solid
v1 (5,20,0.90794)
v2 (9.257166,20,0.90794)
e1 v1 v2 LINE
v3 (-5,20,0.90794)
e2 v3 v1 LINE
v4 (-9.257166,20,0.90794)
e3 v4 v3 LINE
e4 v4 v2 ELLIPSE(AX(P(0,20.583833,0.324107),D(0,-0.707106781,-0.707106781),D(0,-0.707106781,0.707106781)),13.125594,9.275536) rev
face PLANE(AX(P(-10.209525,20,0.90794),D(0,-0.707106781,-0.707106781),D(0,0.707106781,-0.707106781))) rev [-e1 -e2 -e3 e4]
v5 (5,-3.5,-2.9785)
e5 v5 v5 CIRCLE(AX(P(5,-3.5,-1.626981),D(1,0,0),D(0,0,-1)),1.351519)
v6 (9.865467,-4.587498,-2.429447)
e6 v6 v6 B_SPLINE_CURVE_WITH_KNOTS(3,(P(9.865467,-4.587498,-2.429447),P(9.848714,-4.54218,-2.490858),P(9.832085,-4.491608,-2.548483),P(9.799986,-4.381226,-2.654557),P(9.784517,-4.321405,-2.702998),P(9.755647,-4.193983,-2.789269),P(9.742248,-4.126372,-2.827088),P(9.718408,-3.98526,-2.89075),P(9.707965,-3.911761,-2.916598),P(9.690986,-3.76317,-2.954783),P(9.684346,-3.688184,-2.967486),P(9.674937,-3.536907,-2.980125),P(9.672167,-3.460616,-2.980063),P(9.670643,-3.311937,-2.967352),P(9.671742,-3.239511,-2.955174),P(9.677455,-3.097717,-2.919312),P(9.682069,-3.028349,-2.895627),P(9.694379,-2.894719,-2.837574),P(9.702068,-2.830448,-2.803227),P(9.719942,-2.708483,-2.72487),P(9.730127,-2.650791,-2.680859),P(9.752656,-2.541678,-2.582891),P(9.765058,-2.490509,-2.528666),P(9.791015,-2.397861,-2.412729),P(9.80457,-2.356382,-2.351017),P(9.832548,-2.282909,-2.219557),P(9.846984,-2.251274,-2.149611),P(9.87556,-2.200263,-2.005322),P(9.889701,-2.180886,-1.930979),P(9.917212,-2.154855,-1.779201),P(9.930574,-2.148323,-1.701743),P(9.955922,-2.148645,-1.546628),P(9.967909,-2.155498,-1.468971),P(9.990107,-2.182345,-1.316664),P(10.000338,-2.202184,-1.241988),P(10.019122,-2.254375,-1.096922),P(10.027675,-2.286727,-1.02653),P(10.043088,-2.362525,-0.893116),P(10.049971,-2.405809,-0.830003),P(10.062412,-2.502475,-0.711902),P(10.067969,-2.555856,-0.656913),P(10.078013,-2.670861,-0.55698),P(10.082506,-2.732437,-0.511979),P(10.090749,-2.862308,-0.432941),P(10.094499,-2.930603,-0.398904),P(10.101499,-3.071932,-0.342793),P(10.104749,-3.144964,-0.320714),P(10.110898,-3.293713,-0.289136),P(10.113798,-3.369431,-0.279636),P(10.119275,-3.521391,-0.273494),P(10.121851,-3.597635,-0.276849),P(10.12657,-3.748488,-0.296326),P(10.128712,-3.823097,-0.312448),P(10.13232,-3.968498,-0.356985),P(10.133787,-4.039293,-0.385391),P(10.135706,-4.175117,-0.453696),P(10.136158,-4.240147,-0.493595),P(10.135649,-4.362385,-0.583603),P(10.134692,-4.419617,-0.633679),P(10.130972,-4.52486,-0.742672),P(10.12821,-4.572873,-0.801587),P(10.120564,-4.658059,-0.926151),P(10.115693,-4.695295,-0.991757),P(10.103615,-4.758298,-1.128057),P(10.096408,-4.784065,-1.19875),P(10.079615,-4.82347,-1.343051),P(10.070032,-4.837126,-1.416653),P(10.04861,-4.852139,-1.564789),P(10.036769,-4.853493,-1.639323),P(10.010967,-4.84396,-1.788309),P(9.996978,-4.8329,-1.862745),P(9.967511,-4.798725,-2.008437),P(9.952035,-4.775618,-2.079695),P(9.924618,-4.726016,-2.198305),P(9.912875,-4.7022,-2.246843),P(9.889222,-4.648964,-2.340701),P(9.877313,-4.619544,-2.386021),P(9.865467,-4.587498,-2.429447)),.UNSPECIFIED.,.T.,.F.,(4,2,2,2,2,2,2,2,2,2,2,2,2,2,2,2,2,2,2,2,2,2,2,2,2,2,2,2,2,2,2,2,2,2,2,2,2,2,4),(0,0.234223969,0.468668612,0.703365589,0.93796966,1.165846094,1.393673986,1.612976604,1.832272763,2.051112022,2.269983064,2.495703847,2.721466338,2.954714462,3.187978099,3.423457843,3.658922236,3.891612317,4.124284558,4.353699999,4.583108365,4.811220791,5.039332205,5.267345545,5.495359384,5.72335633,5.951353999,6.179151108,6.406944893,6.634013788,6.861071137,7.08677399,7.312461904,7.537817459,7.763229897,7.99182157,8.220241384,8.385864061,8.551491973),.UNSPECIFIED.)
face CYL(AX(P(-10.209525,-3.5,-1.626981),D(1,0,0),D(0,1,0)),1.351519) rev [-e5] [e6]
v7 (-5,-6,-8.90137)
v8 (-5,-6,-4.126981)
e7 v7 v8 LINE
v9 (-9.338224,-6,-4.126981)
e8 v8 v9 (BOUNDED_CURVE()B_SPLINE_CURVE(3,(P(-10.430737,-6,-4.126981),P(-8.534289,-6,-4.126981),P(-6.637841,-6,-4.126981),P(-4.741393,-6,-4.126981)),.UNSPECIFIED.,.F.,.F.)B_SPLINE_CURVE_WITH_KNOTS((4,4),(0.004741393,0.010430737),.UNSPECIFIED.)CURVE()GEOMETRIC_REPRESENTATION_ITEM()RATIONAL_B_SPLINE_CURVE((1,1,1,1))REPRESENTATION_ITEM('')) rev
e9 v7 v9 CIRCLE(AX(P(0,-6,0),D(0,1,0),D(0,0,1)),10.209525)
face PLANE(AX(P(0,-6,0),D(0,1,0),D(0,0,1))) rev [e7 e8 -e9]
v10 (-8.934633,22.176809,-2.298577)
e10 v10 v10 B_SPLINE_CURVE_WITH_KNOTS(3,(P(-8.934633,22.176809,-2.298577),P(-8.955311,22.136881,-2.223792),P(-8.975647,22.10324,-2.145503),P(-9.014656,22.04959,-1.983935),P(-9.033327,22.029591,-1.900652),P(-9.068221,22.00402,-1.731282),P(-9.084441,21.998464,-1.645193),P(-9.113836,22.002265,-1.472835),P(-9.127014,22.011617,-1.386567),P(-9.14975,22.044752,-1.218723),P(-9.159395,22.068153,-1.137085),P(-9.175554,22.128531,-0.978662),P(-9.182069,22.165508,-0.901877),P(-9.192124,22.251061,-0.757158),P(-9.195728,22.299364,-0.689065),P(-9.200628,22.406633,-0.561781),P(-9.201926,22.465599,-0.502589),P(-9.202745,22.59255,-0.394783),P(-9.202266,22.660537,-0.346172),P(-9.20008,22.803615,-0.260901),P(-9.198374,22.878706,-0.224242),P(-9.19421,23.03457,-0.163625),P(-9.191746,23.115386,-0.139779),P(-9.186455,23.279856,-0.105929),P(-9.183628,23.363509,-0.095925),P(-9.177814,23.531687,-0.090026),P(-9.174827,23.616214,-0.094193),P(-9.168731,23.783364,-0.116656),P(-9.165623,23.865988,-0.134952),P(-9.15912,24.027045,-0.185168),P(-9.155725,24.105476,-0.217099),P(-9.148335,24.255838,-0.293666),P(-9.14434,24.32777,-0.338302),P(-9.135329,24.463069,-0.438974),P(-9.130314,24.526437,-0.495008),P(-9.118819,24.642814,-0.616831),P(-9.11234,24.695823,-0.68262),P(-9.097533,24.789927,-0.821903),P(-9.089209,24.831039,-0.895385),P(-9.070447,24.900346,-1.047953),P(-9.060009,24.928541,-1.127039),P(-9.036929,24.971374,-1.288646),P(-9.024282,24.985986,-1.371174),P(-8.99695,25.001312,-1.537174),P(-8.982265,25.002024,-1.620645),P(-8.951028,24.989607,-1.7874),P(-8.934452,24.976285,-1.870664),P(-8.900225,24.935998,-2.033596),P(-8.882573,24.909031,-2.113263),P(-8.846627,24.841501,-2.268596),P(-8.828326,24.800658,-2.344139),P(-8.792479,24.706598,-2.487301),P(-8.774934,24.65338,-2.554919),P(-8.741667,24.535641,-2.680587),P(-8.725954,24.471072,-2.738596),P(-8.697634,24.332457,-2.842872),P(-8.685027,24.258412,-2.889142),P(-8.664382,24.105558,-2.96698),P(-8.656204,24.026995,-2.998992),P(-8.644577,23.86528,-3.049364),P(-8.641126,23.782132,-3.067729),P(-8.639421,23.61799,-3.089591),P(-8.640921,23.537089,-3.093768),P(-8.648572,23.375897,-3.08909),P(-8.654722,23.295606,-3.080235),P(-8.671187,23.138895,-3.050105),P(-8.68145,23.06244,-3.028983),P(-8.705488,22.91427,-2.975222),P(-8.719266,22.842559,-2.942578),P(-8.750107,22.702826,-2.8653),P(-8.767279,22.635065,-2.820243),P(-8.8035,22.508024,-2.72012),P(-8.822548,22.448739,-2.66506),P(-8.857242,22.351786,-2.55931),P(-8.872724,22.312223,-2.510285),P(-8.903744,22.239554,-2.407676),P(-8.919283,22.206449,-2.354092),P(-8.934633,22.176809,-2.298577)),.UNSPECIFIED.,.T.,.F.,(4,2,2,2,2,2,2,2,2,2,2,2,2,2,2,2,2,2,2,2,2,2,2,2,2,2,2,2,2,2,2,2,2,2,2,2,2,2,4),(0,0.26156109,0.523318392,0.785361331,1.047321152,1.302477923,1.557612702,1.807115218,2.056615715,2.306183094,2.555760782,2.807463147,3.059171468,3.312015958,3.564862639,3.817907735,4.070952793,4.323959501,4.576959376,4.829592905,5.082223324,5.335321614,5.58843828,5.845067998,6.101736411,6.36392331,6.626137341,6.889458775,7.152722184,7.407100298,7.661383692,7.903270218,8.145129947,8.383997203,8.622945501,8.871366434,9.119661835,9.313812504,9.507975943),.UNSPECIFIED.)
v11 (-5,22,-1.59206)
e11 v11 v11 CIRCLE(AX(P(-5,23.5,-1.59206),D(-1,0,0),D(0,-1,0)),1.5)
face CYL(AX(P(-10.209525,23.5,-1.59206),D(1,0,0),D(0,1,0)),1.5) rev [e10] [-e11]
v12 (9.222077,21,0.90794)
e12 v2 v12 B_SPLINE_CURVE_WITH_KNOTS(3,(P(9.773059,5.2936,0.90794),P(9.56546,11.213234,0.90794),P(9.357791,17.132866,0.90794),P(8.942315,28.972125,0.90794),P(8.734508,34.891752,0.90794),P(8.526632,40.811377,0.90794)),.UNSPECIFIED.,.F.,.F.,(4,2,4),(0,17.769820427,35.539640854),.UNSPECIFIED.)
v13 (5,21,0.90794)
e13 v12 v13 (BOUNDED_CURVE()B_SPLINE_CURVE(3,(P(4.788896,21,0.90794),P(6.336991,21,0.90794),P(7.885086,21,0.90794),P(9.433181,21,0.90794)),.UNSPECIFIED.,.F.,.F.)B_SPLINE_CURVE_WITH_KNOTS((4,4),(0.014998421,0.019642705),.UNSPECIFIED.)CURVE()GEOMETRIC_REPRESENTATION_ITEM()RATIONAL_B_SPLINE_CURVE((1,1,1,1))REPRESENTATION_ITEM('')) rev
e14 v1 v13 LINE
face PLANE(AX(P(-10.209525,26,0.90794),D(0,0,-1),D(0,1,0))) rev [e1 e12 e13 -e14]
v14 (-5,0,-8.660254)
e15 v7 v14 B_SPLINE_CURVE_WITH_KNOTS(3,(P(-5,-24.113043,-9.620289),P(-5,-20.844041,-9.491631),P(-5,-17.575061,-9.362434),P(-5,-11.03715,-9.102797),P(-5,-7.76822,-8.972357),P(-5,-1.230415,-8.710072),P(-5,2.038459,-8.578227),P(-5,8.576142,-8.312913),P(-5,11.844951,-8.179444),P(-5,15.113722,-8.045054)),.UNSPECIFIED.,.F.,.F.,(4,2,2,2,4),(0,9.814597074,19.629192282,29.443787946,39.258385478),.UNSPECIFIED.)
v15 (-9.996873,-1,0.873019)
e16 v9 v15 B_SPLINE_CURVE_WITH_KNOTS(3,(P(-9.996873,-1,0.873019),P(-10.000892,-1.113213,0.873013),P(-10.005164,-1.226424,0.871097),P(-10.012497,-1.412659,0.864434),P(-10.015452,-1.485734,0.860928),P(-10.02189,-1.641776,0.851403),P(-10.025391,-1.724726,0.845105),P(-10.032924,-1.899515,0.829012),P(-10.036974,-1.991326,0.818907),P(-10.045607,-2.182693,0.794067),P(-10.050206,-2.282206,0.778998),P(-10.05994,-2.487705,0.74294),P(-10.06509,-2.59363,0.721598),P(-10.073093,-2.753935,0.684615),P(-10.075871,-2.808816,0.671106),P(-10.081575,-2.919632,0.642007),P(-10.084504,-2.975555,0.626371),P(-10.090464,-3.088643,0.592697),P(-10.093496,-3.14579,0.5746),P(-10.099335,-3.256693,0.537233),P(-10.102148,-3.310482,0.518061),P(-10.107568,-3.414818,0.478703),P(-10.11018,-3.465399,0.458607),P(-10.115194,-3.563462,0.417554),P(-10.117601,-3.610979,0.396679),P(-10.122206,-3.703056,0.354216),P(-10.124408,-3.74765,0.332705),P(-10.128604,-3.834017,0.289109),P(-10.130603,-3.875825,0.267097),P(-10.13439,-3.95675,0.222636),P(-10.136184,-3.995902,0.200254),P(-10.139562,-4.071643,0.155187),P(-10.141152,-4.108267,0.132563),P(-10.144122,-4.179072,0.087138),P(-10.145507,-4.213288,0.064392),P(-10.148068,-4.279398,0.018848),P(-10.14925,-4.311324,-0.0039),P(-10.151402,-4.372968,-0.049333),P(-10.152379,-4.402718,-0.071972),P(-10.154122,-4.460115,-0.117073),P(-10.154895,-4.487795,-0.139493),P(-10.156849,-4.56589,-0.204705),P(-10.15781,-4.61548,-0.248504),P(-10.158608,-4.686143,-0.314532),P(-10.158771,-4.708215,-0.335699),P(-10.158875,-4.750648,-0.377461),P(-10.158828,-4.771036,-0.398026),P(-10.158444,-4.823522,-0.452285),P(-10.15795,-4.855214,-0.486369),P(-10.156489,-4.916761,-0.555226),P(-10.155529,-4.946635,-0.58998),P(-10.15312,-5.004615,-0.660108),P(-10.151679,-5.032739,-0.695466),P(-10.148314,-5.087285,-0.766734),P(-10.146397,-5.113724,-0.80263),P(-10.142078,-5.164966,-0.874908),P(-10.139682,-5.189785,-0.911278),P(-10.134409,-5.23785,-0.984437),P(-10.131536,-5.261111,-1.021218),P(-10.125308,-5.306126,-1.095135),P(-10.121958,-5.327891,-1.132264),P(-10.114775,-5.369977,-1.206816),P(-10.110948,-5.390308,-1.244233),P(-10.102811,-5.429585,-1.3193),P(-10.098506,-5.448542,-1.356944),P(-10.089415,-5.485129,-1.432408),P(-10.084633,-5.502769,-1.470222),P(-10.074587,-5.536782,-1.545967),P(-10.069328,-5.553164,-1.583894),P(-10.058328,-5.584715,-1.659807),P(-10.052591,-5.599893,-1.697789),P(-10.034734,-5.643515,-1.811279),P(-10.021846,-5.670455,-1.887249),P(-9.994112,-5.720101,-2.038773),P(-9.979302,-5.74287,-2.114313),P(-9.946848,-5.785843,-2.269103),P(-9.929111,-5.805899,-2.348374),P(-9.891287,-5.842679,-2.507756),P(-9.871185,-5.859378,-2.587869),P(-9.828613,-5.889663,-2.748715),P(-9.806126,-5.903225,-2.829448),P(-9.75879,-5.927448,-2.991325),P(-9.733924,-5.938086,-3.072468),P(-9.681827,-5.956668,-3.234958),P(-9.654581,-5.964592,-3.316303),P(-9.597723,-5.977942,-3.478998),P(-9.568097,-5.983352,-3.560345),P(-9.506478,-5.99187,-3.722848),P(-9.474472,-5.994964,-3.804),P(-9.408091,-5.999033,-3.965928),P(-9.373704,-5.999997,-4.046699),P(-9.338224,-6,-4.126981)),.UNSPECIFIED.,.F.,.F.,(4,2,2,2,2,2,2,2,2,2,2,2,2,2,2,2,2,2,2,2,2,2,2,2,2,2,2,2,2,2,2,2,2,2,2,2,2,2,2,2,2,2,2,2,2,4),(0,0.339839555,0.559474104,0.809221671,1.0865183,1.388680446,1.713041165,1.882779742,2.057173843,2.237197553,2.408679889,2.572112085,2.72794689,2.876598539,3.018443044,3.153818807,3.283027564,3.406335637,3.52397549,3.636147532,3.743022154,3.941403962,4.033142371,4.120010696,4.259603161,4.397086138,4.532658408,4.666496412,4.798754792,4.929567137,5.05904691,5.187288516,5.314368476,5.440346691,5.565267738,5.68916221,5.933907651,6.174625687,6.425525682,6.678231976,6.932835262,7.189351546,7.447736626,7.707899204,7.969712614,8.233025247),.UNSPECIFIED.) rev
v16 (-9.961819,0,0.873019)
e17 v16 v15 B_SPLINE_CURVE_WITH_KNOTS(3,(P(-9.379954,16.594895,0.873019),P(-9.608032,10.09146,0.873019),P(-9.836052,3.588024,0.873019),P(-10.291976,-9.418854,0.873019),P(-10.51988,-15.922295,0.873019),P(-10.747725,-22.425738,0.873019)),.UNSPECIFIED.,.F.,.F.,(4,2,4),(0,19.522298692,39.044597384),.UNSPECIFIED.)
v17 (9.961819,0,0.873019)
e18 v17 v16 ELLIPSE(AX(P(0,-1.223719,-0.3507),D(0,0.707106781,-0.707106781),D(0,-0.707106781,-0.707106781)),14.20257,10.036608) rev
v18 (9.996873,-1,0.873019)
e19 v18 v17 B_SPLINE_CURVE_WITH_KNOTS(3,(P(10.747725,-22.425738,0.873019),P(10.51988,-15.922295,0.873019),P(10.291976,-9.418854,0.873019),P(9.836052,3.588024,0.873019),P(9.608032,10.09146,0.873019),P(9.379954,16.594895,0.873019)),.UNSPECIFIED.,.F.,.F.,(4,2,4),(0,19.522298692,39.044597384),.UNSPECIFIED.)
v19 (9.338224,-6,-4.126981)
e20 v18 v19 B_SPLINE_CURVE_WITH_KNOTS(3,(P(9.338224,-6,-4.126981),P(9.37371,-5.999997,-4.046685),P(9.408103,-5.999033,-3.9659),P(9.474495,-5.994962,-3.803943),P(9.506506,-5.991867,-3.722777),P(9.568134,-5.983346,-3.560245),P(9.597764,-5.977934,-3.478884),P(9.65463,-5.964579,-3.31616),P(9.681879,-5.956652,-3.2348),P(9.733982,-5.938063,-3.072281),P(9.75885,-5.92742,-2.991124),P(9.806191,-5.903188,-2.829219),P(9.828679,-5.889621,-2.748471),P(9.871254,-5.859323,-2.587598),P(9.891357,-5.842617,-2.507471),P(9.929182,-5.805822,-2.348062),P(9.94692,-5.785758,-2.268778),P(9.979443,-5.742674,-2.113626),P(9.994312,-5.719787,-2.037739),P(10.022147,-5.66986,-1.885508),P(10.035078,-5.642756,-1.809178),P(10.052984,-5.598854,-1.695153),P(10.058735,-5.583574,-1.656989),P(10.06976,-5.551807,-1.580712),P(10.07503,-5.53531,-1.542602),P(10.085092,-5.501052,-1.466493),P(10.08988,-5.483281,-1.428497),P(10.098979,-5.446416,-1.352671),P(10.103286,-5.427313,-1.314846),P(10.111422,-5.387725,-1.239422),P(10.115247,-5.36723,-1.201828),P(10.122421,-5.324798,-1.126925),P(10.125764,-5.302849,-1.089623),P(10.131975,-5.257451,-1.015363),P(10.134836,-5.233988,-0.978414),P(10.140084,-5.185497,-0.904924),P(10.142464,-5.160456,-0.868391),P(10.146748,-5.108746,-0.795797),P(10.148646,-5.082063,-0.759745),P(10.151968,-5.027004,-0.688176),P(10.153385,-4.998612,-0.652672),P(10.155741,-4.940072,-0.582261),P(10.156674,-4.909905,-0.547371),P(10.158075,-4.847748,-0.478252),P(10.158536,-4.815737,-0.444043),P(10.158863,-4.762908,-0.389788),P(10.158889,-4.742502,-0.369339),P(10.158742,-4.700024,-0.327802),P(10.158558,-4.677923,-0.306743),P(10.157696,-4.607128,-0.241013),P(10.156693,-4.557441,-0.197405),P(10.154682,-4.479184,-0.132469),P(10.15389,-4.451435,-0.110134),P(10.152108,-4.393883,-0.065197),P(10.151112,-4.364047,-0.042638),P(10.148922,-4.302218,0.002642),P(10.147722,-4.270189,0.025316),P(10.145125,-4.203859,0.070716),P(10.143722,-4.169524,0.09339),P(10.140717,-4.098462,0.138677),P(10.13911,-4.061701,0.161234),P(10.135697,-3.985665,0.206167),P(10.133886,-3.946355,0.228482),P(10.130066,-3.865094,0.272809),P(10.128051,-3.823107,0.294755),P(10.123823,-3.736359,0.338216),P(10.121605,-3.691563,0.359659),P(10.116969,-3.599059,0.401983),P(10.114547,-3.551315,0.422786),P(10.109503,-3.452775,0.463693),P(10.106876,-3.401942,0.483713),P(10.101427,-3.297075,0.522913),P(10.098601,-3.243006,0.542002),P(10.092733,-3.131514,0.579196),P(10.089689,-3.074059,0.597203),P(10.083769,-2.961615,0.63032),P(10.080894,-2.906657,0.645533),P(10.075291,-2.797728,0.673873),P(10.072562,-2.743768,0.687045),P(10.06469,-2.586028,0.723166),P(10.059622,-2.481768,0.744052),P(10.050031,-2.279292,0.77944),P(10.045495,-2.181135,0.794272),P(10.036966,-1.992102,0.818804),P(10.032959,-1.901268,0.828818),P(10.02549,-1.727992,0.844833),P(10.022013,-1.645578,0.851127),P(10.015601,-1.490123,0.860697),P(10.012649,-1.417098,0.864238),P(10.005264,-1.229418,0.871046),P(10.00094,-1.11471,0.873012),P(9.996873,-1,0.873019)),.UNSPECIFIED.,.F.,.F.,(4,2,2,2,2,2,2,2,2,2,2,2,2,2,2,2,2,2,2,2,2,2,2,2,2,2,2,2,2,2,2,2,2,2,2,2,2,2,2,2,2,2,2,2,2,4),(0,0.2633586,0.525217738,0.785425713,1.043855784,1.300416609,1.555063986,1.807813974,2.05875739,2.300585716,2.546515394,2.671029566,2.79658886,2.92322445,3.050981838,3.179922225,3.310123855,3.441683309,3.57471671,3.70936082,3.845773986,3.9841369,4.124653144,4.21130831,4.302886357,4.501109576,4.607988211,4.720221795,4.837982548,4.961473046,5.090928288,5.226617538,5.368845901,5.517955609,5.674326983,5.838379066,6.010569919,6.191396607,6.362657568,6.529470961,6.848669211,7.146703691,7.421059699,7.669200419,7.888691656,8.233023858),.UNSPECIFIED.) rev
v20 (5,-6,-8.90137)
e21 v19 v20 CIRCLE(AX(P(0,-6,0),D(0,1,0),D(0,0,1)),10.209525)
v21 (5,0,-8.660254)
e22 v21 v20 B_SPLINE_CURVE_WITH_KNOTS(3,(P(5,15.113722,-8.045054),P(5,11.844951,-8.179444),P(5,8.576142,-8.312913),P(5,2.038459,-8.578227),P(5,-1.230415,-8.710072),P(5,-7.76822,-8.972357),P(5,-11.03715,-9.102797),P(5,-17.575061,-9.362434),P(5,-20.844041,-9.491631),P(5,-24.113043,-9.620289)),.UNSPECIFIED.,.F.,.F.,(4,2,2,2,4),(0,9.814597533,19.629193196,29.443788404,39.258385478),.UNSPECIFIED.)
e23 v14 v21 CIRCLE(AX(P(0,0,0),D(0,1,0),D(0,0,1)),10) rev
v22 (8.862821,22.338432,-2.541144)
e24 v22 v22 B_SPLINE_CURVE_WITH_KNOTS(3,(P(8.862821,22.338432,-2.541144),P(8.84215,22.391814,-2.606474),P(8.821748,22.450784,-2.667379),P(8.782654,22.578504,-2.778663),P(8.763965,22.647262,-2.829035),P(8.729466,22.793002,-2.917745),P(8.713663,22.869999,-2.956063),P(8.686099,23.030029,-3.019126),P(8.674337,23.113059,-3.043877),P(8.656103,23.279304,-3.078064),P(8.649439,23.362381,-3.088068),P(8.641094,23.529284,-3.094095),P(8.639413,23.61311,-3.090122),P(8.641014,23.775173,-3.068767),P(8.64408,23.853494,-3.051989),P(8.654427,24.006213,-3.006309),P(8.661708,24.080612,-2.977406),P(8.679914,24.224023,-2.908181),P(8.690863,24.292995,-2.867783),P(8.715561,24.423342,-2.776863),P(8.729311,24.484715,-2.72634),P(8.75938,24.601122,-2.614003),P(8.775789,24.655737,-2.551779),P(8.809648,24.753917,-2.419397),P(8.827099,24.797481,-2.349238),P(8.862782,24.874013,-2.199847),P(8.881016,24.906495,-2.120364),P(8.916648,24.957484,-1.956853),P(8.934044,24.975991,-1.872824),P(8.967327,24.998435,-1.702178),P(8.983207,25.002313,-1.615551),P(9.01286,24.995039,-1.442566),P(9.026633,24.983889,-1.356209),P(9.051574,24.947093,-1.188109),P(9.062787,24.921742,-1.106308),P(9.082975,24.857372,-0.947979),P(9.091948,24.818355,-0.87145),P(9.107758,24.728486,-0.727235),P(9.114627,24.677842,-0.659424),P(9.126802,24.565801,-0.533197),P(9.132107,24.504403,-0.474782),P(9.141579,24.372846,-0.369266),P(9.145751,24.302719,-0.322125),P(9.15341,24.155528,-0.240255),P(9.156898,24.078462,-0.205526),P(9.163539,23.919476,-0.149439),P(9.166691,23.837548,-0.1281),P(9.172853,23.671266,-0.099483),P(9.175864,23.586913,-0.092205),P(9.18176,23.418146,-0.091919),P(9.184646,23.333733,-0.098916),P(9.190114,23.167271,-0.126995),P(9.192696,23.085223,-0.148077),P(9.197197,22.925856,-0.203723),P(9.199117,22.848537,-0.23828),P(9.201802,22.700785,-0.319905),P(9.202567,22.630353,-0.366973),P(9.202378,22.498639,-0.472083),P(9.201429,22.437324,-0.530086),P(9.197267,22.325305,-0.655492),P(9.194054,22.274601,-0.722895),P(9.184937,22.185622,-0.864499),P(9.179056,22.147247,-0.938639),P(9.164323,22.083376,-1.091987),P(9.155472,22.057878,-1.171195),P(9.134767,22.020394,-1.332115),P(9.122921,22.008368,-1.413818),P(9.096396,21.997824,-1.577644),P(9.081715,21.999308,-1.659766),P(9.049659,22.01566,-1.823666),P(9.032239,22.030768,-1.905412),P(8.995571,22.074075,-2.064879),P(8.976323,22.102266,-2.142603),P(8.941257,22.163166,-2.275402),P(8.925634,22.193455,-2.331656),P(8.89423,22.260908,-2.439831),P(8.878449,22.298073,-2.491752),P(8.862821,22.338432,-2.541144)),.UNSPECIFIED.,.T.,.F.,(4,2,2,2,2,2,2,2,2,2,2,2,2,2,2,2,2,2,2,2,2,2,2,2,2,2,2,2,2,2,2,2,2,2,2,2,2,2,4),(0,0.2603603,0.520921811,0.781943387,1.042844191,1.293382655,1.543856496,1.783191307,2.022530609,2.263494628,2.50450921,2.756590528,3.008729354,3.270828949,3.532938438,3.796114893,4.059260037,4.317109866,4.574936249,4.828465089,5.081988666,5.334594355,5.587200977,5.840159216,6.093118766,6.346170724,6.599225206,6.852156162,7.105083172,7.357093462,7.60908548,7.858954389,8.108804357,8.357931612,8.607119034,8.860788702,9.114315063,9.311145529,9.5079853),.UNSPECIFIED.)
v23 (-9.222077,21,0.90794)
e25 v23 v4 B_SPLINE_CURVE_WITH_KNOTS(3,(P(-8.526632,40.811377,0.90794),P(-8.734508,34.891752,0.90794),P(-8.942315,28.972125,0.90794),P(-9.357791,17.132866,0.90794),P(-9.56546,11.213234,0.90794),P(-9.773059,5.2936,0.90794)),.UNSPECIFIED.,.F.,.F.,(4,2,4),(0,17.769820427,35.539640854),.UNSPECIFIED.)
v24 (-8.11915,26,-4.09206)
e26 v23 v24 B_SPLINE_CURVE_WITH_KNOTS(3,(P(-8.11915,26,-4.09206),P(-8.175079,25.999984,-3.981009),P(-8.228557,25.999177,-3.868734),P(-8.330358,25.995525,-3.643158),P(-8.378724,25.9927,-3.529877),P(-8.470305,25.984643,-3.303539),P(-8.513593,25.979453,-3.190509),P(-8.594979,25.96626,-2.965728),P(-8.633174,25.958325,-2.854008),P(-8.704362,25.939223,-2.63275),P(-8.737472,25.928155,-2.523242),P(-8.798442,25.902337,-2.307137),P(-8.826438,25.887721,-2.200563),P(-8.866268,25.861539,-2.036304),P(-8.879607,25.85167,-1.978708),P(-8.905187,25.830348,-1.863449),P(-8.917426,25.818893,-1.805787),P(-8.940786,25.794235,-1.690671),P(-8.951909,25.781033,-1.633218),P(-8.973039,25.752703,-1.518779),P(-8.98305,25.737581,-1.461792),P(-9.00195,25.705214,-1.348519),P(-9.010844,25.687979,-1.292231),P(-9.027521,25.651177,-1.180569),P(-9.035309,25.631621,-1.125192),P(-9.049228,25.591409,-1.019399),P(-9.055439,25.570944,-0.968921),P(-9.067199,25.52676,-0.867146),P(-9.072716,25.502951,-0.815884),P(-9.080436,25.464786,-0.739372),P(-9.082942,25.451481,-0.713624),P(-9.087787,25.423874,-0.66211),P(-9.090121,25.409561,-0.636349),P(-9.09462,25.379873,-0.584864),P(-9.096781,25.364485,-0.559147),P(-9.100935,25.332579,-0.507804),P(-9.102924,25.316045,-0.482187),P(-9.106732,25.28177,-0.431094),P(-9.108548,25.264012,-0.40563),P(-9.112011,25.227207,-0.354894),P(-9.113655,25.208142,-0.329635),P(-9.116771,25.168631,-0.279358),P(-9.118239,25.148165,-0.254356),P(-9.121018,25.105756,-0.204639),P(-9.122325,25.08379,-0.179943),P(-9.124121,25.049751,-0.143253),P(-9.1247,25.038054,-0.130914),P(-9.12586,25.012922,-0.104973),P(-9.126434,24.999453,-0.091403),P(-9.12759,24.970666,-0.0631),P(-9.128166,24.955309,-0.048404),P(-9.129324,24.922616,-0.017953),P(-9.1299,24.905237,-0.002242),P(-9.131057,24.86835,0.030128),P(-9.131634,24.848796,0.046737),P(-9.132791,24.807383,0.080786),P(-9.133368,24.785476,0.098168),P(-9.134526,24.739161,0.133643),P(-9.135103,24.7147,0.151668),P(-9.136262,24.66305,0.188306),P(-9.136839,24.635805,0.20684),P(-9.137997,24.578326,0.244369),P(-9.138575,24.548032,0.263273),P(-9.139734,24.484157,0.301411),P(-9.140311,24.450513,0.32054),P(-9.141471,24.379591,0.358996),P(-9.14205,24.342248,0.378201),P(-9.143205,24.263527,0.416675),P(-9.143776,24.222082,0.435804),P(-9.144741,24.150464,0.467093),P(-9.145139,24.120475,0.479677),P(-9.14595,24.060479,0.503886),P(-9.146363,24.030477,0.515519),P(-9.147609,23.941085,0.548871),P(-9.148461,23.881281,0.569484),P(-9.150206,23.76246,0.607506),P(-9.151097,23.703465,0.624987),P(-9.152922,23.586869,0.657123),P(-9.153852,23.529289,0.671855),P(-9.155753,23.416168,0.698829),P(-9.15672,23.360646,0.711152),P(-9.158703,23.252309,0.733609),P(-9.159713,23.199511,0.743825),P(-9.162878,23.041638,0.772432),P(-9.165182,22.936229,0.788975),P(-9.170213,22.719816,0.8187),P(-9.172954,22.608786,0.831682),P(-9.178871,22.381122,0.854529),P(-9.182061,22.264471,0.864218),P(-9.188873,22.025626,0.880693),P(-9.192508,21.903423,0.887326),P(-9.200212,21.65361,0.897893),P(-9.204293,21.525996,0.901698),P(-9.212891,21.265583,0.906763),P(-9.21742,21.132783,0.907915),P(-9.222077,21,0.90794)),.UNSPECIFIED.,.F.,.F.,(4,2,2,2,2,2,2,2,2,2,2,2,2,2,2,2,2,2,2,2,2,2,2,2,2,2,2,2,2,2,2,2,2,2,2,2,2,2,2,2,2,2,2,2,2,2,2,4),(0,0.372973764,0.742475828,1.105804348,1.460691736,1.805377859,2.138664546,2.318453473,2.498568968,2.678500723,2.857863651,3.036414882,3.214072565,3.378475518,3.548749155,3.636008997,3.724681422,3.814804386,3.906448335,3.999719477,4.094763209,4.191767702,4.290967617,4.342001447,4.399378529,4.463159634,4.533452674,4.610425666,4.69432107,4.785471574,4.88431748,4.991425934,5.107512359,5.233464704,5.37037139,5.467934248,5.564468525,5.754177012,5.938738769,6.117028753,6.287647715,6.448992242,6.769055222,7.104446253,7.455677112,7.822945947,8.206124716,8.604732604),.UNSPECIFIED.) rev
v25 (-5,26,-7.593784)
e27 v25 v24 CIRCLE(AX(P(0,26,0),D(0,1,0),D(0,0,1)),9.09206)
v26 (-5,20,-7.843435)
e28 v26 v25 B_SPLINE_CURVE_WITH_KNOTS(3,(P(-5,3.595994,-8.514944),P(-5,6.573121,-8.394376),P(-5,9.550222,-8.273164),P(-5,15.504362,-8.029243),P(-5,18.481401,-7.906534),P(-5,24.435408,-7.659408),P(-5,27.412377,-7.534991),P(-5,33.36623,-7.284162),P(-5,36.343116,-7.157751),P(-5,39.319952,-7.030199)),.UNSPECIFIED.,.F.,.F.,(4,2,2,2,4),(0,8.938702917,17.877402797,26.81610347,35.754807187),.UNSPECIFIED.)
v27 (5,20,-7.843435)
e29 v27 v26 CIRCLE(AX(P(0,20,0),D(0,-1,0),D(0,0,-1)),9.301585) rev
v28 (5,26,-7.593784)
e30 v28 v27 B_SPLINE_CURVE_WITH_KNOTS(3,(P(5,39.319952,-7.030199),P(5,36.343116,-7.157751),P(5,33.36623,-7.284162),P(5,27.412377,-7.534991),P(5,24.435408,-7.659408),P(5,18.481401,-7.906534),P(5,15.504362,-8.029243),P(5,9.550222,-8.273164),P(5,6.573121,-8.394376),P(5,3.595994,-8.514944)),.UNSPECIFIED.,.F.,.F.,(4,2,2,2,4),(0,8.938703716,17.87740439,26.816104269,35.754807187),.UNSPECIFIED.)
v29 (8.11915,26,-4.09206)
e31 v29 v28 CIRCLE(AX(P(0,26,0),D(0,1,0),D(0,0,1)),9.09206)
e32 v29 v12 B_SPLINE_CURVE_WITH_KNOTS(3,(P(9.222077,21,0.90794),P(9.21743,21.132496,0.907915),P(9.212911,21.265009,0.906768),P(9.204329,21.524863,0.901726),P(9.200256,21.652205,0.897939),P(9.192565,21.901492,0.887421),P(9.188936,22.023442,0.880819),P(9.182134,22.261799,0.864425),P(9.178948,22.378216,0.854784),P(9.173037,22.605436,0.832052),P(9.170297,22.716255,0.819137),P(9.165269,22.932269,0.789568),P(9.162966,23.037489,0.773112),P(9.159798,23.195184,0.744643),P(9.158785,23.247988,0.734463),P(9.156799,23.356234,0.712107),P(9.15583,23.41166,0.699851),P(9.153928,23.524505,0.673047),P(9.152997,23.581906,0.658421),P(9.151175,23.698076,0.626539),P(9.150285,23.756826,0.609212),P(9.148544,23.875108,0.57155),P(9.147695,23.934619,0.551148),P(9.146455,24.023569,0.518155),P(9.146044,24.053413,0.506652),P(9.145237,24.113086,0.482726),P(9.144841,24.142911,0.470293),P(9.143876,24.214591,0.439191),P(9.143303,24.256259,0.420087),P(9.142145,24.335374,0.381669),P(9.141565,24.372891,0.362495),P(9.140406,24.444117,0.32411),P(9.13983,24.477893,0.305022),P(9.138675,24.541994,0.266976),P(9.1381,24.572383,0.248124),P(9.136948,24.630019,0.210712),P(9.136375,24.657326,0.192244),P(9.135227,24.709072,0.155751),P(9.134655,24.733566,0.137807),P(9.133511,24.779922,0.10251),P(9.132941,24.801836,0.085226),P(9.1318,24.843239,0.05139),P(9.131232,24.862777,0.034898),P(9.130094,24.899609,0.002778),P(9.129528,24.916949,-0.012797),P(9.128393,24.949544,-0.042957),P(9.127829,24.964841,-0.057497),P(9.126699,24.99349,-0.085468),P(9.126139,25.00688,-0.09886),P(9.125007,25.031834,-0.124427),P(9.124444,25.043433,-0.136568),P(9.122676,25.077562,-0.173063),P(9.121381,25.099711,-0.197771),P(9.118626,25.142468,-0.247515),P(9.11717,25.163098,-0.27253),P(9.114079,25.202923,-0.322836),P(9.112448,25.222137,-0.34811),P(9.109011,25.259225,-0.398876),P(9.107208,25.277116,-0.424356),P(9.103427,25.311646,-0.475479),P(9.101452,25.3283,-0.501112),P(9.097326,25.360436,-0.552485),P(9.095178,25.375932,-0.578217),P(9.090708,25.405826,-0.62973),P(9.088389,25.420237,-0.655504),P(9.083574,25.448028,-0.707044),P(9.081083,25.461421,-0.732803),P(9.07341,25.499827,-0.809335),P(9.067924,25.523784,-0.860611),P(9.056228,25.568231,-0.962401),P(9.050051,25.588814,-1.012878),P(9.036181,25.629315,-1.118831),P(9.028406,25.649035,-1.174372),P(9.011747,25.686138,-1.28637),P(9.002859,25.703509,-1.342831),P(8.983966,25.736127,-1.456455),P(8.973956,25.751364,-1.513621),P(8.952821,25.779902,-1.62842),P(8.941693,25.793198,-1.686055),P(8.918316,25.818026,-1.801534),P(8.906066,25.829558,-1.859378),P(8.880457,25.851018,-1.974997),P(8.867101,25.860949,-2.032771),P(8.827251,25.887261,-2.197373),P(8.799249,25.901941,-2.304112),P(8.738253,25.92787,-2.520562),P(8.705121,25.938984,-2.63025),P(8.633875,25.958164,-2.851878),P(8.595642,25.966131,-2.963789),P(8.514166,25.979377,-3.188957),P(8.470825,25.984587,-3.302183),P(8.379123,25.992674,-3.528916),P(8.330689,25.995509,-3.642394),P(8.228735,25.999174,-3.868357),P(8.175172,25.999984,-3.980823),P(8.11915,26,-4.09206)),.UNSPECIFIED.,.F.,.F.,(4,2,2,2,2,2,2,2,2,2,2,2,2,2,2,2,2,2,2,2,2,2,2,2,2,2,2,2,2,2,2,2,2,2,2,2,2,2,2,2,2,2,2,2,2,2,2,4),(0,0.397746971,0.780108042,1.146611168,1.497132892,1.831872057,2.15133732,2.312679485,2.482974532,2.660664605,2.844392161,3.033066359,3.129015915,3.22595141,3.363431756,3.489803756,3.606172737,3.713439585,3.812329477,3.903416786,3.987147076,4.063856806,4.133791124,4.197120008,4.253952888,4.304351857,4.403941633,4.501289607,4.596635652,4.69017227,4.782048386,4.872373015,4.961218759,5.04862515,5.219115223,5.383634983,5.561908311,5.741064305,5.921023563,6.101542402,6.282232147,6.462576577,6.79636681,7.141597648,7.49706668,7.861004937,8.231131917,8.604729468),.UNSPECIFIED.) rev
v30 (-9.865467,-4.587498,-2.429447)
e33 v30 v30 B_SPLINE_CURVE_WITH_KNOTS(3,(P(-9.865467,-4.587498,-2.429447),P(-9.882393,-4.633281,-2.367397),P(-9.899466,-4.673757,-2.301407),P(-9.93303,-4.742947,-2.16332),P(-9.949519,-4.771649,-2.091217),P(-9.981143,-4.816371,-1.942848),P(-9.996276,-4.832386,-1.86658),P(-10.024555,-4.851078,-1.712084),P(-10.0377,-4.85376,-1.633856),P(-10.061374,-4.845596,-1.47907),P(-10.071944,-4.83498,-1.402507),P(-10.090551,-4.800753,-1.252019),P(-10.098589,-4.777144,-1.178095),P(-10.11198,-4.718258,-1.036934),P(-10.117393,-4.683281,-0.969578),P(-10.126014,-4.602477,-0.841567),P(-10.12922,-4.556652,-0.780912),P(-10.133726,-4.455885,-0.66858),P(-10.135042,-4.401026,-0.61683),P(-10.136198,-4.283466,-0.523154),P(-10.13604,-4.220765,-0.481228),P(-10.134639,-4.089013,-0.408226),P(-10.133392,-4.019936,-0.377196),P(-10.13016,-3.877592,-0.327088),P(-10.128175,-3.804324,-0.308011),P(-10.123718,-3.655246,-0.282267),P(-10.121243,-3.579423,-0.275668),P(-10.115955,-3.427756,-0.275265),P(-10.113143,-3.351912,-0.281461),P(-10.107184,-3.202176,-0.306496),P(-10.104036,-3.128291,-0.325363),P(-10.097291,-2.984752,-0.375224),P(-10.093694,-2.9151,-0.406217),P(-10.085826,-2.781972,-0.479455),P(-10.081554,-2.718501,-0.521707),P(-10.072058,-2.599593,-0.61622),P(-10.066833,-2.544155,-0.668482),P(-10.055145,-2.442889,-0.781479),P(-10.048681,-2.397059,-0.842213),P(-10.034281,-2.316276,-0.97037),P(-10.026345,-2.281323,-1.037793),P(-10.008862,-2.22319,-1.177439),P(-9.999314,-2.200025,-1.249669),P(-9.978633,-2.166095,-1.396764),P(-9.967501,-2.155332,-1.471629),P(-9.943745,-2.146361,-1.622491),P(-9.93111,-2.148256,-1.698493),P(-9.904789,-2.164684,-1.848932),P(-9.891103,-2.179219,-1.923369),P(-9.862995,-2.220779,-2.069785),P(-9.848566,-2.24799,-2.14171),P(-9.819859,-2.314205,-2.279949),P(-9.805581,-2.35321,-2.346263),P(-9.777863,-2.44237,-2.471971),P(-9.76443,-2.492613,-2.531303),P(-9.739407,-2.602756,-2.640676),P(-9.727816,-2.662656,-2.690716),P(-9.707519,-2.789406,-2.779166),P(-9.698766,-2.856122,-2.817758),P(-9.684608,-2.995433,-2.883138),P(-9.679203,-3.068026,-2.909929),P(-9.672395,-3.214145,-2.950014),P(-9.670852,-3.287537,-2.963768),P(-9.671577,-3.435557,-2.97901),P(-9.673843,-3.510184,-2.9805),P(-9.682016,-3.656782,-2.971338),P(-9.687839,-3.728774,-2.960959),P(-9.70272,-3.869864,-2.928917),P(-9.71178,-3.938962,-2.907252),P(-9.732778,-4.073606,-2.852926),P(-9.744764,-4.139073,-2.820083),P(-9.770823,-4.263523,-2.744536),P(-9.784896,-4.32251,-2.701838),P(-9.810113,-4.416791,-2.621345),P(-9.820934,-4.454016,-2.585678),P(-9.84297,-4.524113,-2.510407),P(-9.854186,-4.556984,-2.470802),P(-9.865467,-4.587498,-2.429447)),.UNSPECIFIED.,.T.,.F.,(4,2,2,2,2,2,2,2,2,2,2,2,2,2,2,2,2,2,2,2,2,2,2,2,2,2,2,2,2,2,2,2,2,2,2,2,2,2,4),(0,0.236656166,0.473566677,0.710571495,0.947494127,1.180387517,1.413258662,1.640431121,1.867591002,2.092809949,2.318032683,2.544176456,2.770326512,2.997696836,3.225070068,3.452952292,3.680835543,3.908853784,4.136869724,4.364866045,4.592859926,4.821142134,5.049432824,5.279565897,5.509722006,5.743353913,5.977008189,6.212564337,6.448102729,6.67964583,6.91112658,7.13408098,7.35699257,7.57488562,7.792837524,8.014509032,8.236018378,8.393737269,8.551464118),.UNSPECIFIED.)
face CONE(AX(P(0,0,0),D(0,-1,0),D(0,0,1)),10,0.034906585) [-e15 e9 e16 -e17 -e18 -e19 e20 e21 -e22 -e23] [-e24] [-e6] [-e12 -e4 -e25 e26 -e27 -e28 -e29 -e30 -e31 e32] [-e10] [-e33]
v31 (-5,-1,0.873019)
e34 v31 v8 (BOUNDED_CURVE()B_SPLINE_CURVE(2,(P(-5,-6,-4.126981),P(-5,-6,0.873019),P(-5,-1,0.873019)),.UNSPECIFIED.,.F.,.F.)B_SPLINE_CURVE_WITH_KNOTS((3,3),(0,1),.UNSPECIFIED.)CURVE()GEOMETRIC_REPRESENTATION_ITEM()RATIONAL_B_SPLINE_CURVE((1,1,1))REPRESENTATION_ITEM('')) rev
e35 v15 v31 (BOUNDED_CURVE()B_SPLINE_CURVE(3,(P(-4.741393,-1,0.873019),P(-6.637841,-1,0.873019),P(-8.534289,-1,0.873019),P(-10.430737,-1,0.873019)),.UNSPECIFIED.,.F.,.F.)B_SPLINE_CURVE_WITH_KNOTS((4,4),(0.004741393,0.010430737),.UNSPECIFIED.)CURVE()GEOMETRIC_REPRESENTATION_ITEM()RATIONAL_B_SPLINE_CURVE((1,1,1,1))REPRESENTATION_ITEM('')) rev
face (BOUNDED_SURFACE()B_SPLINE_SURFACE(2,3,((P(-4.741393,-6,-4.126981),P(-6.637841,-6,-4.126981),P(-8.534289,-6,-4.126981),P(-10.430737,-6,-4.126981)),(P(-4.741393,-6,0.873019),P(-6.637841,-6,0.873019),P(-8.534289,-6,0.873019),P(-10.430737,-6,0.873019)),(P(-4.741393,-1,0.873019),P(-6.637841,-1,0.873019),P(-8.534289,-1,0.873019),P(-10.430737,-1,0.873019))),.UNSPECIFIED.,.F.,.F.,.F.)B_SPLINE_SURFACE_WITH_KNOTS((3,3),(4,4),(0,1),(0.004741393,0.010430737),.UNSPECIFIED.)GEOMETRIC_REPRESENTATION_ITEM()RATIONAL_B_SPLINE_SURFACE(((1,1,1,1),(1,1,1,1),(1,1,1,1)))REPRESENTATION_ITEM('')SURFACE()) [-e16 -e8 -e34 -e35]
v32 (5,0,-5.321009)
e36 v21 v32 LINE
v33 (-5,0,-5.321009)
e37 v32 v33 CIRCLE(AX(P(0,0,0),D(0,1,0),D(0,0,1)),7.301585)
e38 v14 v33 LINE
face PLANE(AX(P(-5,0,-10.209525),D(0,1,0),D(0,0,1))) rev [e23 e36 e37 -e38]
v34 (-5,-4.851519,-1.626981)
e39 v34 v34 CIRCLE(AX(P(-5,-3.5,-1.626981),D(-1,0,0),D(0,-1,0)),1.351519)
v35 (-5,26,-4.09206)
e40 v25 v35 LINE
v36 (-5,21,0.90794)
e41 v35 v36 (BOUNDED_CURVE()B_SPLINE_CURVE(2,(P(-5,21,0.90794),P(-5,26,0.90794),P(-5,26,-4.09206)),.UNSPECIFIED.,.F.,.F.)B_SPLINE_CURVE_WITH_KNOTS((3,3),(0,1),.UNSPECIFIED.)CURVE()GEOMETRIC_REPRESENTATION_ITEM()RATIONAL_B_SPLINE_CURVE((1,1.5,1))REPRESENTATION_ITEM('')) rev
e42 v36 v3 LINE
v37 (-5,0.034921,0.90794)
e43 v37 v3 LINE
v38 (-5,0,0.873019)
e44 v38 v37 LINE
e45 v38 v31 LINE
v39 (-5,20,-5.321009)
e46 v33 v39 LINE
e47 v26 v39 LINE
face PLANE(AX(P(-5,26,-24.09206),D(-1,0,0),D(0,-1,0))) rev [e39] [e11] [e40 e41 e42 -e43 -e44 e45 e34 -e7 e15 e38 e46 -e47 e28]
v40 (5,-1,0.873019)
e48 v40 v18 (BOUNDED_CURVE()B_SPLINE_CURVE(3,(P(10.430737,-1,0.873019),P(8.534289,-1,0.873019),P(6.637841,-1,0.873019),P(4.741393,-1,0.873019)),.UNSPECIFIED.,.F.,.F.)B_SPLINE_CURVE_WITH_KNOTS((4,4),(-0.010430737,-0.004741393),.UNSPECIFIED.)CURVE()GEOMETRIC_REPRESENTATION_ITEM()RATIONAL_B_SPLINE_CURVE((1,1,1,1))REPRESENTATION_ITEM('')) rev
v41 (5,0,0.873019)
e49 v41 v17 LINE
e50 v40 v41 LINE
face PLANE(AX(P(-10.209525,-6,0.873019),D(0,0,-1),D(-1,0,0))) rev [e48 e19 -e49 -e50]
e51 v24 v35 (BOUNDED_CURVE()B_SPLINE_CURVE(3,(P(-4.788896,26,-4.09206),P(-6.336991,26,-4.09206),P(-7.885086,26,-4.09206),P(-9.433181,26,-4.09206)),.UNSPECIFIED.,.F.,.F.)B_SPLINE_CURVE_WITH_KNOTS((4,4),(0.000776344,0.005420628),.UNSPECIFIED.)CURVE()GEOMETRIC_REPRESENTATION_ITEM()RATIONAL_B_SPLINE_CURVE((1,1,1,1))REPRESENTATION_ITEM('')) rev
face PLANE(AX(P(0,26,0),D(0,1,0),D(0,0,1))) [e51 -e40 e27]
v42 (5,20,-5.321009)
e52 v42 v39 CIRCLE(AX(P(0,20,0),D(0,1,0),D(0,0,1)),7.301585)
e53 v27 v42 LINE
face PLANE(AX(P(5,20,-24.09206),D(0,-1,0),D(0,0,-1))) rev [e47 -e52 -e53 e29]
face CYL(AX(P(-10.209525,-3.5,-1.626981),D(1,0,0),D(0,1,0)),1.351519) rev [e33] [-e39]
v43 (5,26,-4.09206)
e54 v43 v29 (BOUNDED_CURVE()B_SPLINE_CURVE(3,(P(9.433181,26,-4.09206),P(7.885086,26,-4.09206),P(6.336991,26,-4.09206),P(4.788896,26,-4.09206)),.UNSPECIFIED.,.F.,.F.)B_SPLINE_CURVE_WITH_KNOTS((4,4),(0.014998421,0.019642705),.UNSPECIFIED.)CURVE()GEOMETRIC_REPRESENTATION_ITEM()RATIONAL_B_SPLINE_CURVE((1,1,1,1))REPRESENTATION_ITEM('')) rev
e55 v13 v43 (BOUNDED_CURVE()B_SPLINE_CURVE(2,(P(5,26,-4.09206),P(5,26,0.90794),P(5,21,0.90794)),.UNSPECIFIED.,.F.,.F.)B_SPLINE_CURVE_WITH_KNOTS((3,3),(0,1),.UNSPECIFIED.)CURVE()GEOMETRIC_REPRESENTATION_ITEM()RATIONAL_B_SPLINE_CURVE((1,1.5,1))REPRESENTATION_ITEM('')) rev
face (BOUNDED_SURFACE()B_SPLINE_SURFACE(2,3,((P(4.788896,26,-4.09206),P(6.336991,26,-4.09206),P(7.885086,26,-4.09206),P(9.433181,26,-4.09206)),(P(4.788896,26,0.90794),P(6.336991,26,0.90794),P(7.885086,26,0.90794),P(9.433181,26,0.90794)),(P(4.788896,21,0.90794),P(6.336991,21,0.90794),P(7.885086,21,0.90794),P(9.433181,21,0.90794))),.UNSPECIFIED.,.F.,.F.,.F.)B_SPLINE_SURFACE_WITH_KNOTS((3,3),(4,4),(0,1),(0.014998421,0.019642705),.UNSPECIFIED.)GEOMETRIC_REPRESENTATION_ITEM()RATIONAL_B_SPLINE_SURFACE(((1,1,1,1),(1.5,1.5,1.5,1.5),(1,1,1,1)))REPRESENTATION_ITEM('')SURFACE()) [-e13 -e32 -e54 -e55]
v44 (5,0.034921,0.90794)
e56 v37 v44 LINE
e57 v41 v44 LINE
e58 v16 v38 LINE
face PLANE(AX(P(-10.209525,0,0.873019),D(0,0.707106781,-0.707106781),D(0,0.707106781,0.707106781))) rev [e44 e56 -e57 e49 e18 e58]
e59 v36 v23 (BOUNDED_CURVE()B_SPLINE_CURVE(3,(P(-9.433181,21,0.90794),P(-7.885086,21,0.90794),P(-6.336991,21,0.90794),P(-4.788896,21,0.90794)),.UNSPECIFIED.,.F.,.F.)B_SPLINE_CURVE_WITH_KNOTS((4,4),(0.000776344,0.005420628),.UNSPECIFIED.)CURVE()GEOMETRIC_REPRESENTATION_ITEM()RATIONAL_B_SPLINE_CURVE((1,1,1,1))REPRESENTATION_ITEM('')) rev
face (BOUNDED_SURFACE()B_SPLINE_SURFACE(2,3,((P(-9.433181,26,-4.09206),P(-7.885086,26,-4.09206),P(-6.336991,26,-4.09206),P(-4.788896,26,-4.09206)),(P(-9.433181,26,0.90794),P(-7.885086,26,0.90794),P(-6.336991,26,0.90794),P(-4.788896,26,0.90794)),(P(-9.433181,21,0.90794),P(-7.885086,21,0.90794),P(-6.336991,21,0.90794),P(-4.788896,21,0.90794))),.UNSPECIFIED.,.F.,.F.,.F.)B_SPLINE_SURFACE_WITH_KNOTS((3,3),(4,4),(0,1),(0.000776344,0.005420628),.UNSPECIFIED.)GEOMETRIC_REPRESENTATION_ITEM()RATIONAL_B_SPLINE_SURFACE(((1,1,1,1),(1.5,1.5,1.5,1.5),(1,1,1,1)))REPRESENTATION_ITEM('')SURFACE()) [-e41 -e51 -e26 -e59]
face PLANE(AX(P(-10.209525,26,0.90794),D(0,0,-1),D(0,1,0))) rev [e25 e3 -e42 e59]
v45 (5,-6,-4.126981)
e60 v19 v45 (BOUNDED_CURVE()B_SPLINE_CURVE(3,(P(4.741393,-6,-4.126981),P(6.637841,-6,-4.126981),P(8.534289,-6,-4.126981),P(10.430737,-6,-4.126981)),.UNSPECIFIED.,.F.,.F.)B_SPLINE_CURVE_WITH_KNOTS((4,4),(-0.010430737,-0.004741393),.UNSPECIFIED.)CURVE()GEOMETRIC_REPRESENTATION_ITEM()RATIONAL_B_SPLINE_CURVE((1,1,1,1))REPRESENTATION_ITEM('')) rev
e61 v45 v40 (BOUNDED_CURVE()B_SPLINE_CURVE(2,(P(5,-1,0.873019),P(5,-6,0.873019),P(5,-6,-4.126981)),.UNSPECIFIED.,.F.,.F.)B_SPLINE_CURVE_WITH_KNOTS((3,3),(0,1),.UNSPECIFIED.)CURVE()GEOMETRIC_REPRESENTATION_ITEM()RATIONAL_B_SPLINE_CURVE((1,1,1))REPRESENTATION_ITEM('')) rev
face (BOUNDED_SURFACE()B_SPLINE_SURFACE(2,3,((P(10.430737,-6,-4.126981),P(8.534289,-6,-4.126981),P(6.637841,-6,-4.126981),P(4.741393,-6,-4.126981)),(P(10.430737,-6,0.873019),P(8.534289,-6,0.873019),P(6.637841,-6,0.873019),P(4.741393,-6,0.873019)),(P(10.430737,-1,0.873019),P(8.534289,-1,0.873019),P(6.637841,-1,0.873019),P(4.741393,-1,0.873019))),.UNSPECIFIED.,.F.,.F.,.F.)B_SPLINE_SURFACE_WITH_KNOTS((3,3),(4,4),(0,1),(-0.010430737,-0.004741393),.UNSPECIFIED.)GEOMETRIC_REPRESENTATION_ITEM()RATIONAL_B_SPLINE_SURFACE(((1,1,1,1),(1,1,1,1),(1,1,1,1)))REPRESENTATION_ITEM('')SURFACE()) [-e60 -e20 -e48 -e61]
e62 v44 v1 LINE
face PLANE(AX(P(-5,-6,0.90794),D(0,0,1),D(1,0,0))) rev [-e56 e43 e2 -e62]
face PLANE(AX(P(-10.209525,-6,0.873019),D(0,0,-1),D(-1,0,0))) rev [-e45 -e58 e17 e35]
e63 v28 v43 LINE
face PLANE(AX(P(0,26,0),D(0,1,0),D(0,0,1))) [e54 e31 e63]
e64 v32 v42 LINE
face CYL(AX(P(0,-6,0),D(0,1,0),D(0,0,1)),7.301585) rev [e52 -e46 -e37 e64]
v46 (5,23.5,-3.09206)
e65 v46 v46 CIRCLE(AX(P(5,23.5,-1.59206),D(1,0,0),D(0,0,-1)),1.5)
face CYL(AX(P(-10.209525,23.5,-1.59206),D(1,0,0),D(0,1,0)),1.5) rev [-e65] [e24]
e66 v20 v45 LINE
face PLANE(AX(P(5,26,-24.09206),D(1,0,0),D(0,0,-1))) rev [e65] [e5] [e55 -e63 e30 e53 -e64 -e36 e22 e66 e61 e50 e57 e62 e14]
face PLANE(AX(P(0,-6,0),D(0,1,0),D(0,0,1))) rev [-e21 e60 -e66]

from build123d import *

# Parameters (mm, degrees)
SKETCH1_R                     = 10
BOSS_EXTRUDE1_DEPTH           = 26
BOSS_EXTRUDE1_TAPER           = 2
BOSS_EXTRUDE1_OTHER_WAY_DEPTH = 6
BOSS_EXTRUDE1_OTHER_WAY_TAPER = -2
CUT_EXTRUDE1_DEPTH            = 30.740019936
CUT_EXTRUDE1_DEPTH_BACK       = 30.740019936
SKETCH3_W                     = 10
SKETCH3_H                     = 6
CUT_EXTRUDE2_DEPTH            = 25
CUT_EXTRUDE3_DEPTH            = 32.805094434
CUT_EXTRUDE3_DEPTH_BACK       = 32.805094434
SKETCH4_R                     = 1.5
FILLET2_SIZE                  = 5
CUT_EXTRUDE5_DEPTH            = 30.740020092
CUT_EXTRUDE5_DEPTH_BACK       = 30.740020092
SKETCH8_W                     = 10
SKETCH8_H                     = 6
CUT_EXTRUDE6_DEPTH            = 31.050909814
CUT_EXTRUDE7_DEPTH            = 30.668744533
CUT_EXTRUDE8_DEPTH            = 32.738456946
CUT_EXTRUDE8_DEPTH_BACK       = 32.738456946
SKETCH9_R                     = 1.351518808
FILLET3_SIZE                  = 5


with BuildPart() as part:
    # Sketch1 → Boss-Extrude1 (new body)
    with BuildSketch(Plane(origin=(0, 0, 0), x_dir=(1, 0, 0), z_dir=(0, 1, 0))):
        Circle(SKETCH1_R)
    extrude(amount=BOSS_EXTRUDE1_DEPTH, taper=BOSS_EXTRUDE1_TAPER)

    # Sketch1 → Boss-Extrude1 other way (add)
    with BuildSketch(Plane(origin=(0, 0, 0), x_dir=(1, 0, 0), z_dir=(0, 1, 0))):
        Circle(SKETCH1_R)
    extrude(amount=-BOSS_EXTRUDE1_OTHER_WAY_DEPTH, taper=BOSS_EXTRUDE1_OTHER_WAY_TAPER)

    # Sketch2 → Cut-Extrude1 (cut, two sides: drawn at the far end of the back side and taken through both)
    with BuildSketch(Plane(origin=(0, 0, 0), x_dir=(0, 0, -1), z_dir=(1, 0, 0)).offset(-CUT_EXTRUDE1_DEPTH_BACK)):
        Polygon((-0.907940007, 26), (-0.907940007, 20), (-13.415596948, 7.492343059), (-13.415596948, 26), align=None)
    extrude(amount=CUT_EXTRUDE1_DEPTH + CUT_EXTRUDE1_DEPTH_BACK, mode=Mode.SUBTRACT)

    # Sketch3 → Cut-Extrude2 (cut)
    with BuildSketch(Plane.XY.offset(0.907940007)):
        with Locations((0, 23)):
            Rectangle(SKETCH3_W, SKETCH3_H)
    extrude(amount=-CUT_EXTRUDE2_DEPTH, mode=Mode.SUBTRACT)

    # Sketch4 → Cut-Extrude3 (cut, two sides: drawn at the far end of the back side and taken through both)
    with BuildSketch(Plane(origin=(-5, 0, 0), x_dir=(0, 0, -1), z_dir=(1, 0, 0)).offset(-CUT_EXTRUDE3_DEPTH_BACK)):
        with Locations((1.592059993, 23.5)):
            Circle(SKETCH4_R)
    extrude(amount=CUT_EXTRUDE3_DEPTH + CUT_EXTRUDE3_DEPTH_BACK, mode=Mode.SUBTRACT)

    # Fillet2
    # a fillet whose section is not a circle: 5 mm, written as the material it takes off along each edge
    with BuildSketch(Plane(origin=(-7.5, 26, 0.907940007), x_dir=(0, -1, 0), z_dir=(1, 0, 0))) as fillet2_piece_1:
        with BuildLine():
            Bezier((FILLET2_SIZE, 0), (0, 0), (0, FILLET2_SIZE), weights=[1, 1.5, 1])
            Line((0, FILLET2_SIZE), (0, 0))
            Line((0, 0), (FILLET2_SIZE, 0))
        make_face()
    extrude(amount=29.046612618, mode=Mode.SUBTRACT)
    with BuildSketch(Plane(origin=(-21.546612618, 26, 0.907940007), x_dir=(0, 0, -1), z_dir=(1, 0, 0))) as fillet2_piece_2:
        with BuildLine():
            Bezier((FILLET2_SIZE, 0), (0, 0), (0, -FILLET2_SIZE), weights=[1, 1.5, 1])
            Line((0, -FILLET2_SIZE), (0, 0))
            Line((0, 0), (FILLET2_SIZE, 0))
        make_face()
    extrude(amount=29.046612618, mode=Mode.SUBTRACT)

    # Sketch7 → Cut-Extrude5 (cut, two sides: drawn at the far end of the back side and taken through both)
    with BuildSketch(Plane(origin=(0, 0, 0), x_dir=(0, 0, -1), z_dir=(1, 0, 0)).offset(-CUT_EXTRUDE5_DEPTH_BACK)):
        Polygon((-0.873019237, -6), (-0.873019237, 0), (-11.31781305, 10.444793812), (-11.31781305, -6), align=None)
    extrude(amount=CUT_EXTRUDE5_DEPTH + CUT_EXTRUDE5_DEPTH_BACK, mode=Mode.SUBTRACT)

    # Sketch8 → Cut-Extrude6 (cut, through all)
    with BuildSketch(Plane.XY.offset(0.873019237)):
        with Locations((0, -3)):
            Rectangle(SKETCH8_W, SKETCH8_H)
    extrude(amount=-CUT_EXTRUDE6_DEPTH, mode=Mode.SUBTRACT)

    # Sketch6 → Cut-Extrude7 (cut, through all)
    with BuildSketch(Plane(origin=(0, 20, 0), x_dir=(1, 0, 0), z_dir=(0, 1, 0))):
        with BuildLine():
            Line((5, 5.321009098), (5, -0.907940007))
            Line((5, -0.907940007), (-5, -0.907940007))
            Line((-5, -0.907940007), (-5, 5.321009098))
            ThreePointArc((-5, 5.321009098), (0, 7.30158461), (5, 5.321009098))
        make_face()
    extrude(amount=-CUT_EXTRUDE7_DEPTH, mode=Mode.SUBTRACT)

    # Sketch9 → Cut-Extrude8 (cut, two sides: drawn at the far end of the back side and taken through both)
    with BuildSketch(Plane(origin=(-5, 0, 0), x_dir=(0, 0, -1), z_dir=(1, 0, 0)).offset(-CUT_EXTRUDE8_DEPTH_BACK)):
        with Locations((1.626980763, -3.5)):
            Circle(SKETCH9_R)
    extrude(amount=CUT_EXTRUDE8_DEPTH + CUT_EXTRUDE8_DEPTH_BACK, mode=Mode.SUBTRACT)

    # Fillet3
    # a fillet whose section is not a circle: 5 mm, written as the material it takes off along each edge
    with BuildSketch(Plane(origin=(22.672130078, -6, 0.873019237), x_dir=(0, 0, -1), z_dir=(-1, 0, 0))) as fillet3_piece_1:
        with BuildLine():
            Bezier((FILLET3_SIZE, 0), (0, 0), (0, -FILLET3_SIZE), weights=[1, 1, 1])
            Line((0, -FILLET3_SIZE), (0, 0))
            Line((0, 0), (FILLET3_SIZE, 0))
        make_face()
    extrude(amount=30.172130078, mode=Mode.SUBTRACT)
    with BuildSketch(Plane(origin=(7.5, -6, 0.873019237), x_dir=(0, 1, 0), z_dir=(-1, 0, 0))) as fillet3_piece_2:
        with BuildLine():
            Bezier((FILLET3_SIZE, 0), (0, 0), (0, FILLET3_SIZE), weights=[1, 1, 1])
            Line((0, FILLET3_SIZE), (0, 0))
            Line((0, 0), (FILLET3_SIZE, 0))
        make_face()
    extrude(amount=30.172130078, mode=Mode.SUBTRACT)


solid = part.part
